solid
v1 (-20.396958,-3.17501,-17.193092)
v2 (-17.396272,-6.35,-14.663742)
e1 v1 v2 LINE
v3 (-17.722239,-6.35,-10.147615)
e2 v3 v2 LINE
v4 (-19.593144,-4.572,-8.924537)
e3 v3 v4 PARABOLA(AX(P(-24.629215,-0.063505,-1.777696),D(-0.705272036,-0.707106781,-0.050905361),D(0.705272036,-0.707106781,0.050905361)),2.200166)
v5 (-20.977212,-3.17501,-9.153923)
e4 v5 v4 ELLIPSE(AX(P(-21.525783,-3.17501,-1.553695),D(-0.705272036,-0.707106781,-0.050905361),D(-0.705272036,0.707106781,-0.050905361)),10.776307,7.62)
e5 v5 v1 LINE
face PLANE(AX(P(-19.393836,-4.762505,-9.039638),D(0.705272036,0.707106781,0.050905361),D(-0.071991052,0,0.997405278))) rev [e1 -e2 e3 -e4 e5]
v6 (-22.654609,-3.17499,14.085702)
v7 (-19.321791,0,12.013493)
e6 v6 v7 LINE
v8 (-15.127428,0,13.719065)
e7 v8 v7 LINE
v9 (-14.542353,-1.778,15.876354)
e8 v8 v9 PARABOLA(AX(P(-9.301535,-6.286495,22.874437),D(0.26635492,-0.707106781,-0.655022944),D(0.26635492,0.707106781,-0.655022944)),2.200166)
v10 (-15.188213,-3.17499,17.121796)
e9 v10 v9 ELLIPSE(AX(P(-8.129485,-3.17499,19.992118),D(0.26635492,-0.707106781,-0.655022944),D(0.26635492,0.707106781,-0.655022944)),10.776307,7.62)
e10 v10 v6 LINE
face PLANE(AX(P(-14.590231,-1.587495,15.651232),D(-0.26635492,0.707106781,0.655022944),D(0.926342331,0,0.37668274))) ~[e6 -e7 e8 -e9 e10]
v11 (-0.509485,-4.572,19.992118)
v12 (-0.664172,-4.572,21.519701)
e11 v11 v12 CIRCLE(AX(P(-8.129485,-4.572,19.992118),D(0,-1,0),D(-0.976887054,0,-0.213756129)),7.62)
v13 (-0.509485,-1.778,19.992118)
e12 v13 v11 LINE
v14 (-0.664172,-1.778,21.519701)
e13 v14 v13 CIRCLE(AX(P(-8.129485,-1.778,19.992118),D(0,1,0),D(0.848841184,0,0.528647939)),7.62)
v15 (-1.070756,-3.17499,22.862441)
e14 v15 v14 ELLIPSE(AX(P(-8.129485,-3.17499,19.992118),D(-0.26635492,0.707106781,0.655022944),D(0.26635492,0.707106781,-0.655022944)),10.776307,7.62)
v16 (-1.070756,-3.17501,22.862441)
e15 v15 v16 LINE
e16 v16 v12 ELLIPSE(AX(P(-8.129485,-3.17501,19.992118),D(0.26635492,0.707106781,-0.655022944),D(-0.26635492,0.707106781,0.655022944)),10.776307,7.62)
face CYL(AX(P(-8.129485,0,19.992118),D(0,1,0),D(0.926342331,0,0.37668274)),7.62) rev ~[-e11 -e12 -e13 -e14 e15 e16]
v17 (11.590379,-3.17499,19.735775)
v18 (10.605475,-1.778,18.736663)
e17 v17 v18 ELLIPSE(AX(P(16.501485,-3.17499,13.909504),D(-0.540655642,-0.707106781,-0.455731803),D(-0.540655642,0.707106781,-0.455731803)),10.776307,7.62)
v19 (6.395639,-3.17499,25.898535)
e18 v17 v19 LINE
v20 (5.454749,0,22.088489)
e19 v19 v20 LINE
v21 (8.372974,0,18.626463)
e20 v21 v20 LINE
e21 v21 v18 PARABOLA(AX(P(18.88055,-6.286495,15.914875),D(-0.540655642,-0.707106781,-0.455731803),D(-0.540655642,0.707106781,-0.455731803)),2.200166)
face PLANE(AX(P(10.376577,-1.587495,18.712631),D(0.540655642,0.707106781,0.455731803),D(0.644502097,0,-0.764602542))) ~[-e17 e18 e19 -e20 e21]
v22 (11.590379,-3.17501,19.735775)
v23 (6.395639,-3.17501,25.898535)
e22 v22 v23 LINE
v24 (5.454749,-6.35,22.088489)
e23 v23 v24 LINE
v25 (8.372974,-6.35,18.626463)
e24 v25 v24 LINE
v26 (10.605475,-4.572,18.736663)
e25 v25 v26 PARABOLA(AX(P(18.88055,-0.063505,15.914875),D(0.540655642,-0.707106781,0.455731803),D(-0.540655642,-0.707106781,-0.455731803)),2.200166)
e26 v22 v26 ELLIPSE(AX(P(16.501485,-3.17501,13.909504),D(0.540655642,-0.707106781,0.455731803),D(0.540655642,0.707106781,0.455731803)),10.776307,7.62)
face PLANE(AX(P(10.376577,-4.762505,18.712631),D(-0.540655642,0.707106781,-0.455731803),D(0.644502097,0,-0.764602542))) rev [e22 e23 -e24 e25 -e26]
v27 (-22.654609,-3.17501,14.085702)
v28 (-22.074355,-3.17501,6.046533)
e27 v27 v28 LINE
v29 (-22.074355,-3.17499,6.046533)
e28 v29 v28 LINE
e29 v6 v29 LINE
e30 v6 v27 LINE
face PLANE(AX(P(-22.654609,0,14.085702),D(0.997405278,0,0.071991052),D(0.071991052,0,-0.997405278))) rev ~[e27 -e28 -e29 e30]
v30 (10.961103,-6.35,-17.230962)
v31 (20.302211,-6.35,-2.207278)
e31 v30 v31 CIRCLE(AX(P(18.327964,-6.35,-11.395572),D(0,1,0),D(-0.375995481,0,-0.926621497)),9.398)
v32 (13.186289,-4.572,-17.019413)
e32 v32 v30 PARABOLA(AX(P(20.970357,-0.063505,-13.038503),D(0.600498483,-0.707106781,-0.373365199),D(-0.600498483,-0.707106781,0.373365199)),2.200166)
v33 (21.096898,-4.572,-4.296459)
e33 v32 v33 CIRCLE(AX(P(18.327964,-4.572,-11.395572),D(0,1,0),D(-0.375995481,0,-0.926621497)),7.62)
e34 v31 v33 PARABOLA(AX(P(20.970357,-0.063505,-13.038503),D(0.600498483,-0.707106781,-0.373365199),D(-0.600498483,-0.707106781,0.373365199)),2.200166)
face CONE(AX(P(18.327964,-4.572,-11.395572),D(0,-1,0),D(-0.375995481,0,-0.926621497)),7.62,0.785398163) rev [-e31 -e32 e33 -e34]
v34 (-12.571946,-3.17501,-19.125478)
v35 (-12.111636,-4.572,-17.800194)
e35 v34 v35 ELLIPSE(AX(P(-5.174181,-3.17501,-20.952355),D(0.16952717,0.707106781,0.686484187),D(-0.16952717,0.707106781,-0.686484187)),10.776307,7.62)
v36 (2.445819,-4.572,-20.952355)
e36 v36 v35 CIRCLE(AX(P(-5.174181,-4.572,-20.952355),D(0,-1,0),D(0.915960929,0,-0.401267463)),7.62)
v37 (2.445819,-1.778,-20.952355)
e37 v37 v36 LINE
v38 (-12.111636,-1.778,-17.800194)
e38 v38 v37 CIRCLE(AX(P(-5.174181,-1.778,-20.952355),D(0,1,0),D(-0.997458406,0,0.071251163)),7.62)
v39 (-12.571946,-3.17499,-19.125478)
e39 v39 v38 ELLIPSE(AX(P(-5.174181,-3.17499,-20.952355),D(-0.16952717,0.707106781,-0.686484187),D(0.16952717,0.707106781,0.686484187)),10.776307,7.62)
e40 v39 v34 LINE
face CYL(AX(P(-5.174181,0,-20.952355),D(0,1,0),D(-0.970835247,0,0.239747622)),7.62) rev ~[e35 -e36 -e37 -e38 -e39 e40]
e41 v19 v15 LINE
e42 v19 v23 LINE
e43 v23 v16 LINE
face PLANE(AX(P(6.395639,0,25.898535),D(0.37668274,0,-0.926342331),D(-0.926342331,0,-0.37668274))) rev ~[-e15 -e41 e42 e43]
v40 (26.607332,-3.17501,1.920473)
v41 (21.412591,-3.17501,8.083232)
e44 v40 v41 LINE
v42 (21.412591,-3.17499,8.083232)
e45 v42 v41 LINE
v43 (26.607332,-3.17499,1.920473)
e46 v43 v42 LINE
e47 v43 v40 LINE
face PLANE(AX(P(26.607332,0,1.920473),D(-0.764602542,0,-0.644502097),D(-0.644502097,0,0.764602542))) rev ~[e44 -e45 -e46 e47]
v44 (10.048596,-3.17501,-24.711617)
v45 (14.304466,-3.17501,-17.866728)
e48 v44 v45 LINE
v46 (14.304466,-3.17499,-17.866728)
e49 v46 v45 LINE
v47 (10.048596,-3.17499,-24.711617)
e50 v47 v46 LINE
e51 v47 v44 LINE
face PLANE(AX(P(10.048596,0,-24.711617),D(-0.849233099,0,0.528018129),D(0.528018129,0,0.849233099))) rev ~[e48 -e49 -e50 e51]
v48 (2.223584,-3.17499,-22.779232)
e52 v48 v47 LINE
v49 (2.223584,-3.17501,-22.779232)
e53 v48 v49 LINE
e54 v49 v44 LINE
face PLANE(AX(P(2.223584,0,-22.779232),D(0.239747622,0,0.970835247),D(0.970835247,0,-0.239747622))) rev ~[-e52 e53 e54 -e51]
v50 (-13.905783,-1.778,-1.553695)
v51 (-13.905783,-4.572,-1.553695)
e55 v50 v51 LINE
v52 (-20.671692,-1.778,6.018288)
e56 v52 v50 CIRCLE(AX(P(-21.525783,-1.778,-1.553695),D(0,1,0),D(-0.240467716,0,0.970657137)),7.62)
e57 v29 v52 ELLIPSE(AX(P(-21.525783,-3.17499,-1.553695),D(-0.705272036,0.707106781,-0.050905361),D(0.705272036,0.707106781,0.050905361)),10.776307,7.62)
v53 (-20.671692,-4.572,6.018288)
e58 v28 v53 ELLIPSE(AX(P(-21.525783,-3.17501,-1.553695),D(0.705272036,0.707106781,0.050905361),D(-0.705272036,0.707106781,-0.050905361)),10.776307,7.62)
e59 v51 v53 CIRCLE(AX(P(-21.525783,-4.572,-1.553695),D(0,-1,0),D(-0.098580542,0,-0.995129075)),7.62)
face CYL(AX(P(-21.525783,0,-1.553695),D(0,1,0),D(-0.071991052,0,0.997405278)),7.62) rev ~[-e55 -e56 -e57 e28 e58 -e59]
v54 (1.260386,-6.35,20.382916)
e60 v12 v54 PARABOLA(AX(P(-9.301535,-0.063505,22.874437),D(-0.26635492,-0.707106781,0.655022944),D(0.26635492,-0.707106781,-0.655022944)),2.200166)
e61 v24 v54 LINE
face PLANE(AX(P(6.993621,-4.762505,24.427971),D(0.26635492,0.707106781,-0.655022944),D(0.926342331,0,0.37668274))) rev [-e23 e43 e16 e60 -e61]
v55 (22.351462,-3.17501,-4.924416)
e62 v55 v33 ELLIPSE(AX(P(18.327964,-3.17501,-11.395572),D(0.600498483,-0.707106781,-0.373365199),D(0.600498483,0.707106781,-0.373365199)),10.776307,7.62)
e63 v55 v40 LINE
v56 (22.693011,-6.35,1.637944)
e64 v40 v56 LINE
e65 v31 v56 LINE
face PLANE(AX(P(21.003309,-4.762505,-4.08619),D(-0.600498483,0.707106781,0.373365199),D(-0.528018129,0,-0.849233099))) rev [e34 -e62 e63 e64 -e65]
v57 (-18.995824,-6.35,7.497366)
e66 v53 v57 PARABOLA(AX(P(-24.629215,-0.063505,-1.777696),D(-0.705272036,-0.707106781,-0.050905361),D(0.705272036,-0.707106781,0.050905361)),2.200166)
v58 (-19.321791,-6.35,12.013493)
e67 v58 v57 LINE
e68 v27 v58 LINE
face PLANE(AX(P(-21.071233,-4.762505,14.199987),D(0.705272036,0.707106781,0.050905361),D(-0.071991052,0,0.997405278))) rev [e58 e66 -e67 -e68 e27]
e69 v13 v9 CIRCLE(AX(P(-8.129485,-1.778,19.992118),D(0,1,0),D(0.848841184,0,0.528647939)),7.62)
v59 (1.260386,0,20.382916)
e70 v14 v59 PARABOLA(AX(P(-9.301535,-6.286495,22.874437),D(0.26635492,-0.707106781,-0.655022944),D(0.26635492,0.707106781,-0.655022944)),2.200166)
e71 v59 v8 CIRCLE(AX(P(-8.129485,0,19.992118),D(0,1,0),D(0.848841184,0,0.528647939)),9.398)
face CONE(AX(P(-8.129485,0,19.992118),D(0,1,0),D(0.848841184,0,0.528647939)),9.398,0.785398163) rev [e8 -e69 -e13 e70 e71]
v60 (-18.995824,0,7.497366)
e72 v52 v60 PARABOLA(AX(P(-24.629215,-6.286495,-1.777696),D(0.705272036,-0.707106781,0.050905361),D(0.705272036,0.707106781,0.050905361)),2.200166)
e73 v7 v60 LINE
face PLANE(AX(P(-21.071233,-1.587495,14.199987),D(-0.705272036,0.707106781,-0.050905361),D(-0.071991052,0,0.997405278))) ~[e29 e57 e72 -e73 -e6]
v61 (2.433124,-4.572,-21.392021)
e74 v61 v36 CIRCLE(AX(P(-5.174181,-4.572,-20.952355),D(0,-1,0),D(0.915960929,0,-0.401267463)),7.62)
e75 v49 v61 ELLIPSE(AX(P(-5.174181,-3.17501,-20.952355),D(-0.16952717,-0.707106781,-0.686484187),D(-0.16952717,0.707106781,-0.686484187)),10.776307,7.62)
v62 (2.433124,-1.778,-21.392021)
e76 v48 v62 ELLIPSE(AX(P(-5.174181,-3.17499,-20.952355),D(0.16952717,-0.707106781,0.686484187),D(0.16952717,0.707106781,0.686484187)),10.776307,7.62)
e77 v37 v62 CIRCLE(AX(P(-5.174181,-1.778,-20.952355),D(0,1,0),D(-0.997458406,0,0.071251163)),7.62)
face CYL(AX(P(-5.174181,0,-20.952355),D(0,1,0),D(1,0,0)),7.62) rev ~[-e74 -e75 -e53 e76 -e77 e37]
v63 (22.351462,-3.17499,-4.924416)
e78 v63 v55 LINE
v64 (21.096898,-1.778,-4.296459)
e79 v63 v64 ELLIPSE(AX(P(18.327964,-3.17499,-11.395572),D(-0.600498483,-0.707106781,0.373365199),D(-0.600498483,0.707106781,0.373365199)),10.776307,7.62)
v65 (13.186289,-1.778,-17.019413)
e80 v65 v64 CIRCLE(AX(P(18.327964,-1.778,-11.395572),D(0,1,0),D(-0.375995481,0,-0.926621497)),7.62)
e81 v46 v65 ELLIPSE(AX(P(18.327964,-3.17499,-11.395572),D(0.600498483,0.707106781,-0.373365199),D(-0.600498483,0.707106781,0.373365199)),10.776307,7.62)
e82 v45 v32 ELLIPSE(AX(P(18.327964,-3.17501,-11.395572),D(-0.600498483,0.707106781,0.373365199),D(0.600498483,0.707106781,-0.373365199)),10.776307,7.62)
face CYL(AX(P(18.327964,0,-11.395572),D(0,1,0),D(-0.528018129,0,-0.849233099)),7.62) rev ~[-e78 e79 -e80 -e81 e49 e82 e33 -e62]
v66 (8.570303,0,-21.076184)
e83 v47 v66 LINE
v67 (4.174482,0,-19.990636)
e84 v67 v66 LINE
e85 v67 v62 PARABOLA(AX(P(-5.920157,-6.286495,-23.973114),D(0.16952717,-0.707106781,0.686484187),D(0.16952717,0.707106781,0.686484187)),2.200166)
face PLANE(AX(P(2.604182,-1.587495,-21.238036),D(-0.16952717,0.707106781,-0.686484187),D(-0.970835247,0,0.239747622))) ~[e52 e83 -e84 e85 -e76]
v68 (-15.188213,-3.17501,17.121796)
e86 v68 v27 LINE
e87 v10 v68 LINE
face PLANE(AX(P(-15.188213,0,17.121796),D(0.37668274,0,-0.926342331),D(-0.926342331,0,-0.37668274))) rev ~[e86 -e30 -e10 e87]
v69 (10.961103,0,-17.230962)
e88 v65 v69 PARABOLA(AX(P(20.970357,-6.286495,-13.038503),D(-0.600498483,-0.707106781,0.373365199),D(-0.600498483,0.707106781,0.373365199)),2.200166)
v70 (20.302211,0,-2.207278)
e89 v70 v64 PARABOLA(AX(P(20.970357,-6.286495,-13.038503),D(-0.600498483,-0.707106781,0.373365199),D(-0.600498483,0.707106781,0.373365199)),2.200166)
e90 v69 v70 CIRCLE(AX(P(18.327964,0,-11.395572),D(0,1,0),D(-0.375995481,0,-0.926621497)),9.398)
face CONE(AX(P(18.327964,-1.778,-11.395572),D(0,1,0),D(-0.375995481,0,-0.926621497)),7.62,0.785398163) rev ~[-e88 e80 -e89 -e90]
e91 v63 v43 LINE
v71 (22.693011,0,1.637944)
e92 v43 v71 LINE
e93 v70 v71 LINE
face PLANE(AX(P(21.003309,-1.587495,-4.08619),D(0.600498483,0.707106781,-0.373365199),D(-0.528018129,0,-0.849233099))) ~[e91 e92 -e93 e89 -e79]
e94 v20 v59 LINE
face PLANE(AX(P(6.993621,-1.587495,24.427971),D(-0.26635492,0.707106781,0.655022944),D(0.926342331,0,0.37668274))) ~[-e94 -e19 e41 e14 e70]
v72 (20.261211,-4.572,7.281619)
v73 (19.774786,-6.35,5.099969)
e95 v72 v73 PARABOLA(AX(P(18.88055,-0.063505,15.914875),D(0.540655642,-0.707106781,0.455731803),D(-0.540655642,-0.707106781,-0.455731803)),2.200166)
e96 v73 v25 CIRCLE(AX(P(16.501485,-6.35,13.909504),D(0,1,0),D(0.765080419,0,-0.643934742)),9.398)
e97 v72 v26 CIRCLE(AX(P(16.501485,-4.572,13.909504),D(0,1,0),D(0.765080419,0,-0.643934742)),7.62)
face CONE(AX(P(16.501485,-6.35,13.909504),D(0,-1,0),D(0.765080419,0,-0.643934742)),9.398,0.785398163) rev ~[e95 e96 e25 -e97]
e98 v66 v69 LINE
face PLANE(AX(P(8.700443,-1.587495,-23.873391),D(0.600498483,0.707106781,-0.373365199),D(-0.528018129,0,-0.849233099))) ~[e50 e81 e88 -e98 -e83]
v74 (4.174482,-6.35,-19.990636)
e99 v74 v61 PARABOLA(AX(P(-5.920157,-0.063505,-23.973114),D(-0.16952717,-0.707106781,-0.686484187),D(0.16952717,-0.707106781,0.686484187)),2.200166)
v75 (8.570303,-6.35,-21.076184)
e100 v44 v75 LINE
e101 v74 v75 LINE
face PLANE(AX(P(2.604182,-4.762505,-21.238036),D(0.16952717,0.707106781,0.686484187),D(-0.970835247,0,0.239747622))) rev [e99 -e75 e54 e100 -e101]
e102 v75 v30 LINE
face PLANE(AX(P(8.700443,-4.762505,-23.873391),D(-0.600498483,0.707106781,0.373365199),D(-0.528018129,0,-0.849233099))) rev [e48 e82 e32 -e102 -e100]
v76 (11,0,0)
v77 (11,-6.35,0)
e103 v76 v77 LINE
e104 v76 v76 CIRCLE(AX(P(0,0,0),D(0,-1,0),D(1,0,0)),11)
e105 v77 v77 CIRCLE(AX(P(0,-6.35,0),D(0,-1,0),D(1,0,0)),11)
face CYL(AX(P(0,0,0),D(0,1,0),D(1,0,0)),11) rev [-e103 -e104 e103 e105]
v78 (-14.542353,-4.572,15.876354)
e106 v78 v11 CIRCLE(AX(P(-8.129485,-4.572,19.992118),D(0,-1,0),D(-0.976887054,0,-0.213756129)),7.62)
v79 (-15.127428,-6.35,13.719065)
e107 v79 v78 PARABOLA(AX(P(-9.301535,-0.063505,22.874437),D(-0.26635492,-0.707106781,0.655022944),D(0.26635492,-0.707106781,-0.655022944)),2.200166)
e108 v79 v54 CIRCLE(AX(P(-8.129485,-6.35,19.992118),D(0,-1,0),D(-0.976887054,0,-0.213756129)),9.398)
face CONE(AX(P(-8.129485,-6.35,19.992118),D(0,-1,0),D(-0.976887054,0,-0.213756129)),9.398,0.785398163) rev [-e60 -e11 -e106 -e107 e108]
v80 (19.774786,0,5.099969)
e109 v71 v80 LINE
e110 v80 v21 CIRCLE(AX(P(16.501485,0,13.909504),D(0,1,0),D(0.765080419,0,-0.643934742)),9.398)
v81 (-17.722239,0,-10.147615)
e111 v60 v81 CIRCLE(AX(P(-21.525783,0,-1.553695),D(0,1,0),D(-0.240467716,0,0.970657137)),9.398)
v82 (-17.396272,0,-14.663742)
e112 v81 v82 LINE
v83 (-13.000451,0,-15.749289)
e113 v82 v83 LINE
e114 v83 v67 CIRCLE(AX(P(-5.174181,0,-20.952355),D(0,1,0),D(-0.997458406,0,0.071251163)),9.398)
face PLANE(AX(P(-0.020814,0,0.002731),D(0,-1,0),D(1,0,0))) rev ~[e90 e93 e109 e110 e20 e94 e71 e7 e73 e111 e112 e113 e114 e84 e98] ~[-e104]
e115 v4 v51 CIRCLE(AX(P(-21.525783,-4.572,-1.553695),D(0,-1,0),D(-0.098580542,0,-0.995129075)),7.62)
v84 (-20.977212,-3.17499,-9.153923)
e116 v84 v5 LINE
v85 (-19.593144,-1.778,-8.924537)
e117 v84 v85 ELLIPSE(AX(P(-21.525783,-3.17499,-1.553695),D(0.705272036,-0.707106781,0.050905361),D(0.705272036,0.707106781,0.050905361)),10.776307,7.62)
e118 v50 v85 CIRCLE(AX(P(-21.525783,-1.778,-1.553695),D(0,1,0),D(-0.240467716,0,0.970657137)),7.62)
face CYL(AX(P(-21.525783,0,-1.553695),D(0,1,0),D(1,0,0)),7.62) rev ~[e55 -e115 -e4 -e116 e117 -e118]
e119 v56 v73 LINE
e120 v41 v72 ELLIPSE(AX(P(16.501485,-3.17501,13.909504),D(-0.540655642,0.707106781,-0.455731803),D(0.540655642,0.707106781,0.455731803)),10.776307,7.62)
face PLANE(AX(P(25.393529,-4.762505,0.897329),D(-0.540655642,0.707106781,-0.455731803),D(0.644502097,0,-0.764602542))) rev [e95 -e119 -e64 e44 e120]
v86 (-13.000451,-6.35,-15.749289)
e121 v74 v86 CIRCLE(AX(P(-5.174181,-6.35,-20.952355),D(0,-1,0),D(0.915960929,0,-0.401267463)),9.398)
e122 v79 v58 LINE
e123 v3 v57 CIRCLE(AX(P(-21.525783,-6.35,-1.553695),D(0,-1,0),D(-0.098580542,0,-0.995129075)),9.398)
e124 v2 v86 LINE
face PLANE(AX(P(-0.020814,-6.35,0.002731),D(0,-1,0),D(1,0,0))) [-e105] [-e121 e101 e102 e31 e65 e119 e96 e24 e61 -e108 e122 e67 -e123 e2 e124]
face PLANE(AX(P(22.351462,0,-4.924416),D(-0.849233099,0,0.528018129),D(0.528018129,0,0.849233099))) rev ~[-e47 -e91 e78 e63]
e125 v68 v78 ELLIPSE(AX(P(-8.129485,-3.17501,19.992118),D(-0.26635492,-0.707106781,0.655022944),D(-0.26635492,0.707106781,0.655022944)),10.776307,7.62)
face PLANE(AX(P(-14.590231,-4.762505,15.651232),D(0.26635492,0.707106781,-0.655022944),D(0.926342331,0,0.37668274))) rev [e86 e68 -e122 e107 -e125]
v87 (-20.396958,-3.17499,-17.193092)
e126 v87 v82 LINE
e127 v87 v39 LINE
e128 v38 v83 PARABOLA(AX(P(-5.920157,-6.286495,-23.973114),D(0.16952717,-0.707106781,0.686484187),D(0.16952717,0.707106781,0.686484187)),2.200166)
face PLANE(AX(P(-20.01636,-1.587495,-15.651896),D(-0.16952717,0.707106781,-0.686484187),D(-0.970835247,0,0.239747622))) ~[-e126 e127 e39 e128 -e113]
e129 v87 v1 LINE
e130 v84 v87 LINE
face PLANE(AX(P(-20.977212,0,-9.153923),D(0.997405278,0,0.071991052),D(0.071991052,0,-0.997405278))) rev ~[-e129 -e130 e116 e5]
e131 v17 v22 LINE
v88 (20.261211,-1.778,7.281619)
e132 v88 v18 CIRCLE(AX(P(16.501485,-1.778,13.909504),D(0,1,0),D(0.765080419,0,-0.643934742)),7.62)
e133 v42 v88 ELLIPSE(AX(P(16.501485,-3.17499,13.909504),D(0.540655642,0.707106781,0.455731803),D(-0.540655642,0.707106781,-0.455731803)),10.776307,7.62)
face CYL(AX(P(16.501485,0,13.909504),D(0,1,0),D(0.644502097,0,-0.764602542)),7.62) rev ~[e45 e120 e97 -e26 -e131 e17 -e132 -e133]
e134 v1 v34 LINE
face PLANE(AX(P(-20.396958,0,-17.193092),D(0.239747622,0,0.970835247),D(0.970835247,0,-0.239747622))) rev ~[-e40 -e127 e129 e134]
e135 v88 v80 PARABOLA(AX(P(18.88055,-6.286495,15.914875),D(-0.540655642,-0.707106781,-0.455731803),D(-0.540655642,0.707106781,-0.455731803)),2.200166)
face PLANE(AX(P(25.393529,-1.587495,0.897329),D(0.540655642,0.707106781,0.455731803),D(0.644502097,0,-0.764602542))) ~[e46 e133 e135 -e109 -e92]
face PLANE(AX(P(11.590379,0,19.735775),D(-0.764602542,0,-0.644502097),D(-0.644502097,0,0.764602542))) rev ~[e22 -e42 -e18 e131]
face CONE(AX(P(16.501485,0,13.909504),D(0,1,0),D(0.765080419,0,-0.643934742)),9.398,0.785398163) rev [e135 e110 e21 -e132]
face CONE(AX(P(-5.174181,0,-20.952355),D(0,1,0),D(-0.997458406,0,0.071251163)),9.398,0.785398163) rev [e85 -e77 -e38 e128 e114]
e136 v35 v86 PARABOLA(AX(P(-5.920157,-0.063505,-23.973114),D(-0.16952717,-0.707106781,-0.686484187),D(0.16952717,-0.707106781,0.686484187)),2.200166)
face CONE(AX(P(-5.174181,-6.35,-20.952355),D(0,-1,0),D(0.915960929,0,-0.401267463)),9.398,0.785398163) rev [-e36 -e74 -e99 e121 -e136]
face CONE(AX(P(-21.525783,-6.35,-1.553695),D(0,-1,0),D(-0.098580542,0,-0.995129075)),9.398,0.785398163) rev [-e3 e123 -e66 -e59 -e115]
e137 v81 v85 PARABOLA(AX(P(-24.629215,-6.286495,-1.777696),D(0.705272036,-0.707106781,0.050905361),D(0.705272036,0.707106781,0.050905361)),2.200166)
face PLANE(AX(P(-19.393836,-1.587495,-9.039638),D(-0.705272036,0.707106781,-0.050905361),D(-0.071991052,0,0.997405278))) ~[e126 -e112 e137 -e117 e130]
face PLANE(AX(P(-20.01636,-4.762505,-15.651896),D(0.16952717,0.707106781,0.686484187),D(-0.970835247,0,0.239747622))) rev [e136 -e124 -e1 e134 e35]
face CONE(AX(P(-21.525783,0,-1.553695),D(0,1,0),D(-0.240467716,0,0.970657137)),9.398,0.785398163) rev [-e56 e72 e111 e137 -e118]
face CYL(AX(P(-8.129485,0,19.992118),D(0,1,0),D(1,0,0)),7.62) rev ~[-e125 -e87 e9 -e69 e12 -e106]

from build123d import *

# Parameters (mm, degrees)
F0_R         = 11
F1_DEPTH     = 6.35
F2_SIZE      = 3.17499
F3_T2_ANGLE  = 199.5715846066
F3_T4_ANGLE  = 199.5715846066
F3_T6_ANGLE  = 199.5715846066
F3_T8_ANGLE  = 199.5715846066
F3_T10_ANGLE = 199.5715846066
F3_T12_ANGLE = 199.5715846066
F3_T14_ANGLE = 199.5715846066
F3_T16_ANGLE = 199.5715846066
F3_T18_ANGLE = 199.5715846066
F3_T20_ANGLE = 199.5715846066


# Not quite as in the source:
# - a fillet or chamfer that OpenCascade refuses, or shapes differently, is made with other operations: its cross-section is extruded or revolved along the edge and cut away or added
# - a fillet or chamfer is up to 0.001 mm smaller than in the source, because OpenCascade refuses the exact size


with BuildPart() as f1:
    # F0 (on Front) → F1 (new body)
    with BuildSketch(Plane.XZ):
        with BuildLine():
            Line((11.5903794876, 19.7357752055), (6.395639386, 25.8985348046))
            Line((6.395639386, 25.8985348046), (-1.0707562618, 22.8624408289))
            ThreePointArc((-1.0707562618, 22.8624408289), (-0.6511189694, 21.4544603732), (-0.5094848211, 19.9921183513))
            ThreePointArc((-0.5094848211, 19.9921183513), (-6.6671427992, 12.5137524996), (-15.1882133804, 17.1217958736))
            Line((-15.1882133804, 17.1217958736), (-22.6546090282, 14.085701898))
            Line((-22.6546090282, 14.085701898), (-22.0743552105, 6.0465330289))
            ThreePointArc((-22.0743552105, 6.0465330289), (-16.3352014079, 4.025037517), (-13.9057833978, -1.5536951891))
            ThreePointArc((-13.9057833978, -1.5536951891), (-15.9470506916, -6.744277179), (-20.977211585, -9.1539234072))
            Line((-20.977211585, -9.1539234072), (-20.3969577673, -17.1930922762))
            Line((-20.3969577673, -17.1930922762), (-12.5719455381, -19.125477903))
            ThreePointArc((-12.5719455381, -19.125477903), (-4.2540087238, -13.3881176755), (2.4458190468, -20.9523547863))
            ThreePointArc((2.4458190468, -20.9523547863), (2.3900561576, -21.8725270157), (2.2235836317, -22.7792316697))
            Line((2.2235836317, -22.7792316697), (10.0485958609, -24.7116172964))
            Line((10.0485958609, -24.7116172964), (14.3044655632, -17.866728424))
            ThreePointArc((14.3044655632, -17.866728424), (11.8568074939, -7.3720740717), (22.3514618462, -4.9244160023))
            Line((22.3514618462, -4.9244160023), (26.6073315486, 1.9204728701))
            Line((26.6073315486, 1.9204728701), (21.412591447, 8.0832324691))
            ThreePointArc((21.412591447, 8.0832324691), (10.6752140991, 8.9983978576), (11.5903794876, 19.7357752055))
        make_face()
        Circle(F0_R, mode=Mode.SUBTRACT)
    extrude(amount=F1_DEPTH)

    # F2 (size 3.175 in the source; OpenCascade refuses exactly that, so slightly less here)
    f2_edges = [f1.edges().sort_by_distance(p)[0] for p in [
        (24.479397, -6.35, -1.501972),
        (24.009961, -6.35, 5.001853),
        (8.993009, -6.35, 22.817155),
        (2.662442, -6.35, 24.380488),
        (-18.921411, -6.35, 15.603749),
        (-22.364482, -6.35, 10.066117),
        (-20.687085, -6.35, -13.173508),
        (-16.484452, -6.35, -18.159285),
        (24.009961, 0, 5.001853),
        (24.479397, 0, -1.501972),
        (8.993009, 0, 22.817155),
        (2.662442, 0, 24.380488),
        (-18.921411, 0, 15.603749),
        (-22.364482, 0, 10.066117),
        (-20.687085, 0, -13.173508),
        (-16.484452, 0, -18.159285),
        (6.13609, 0, -23.745424),
        (12.176531, 0, -21.289173),
        (12.176531, -6.35, -21.289173),
        (6.13609, -6.35, -23.745424),
    ]]
    chamfer(f2_edges, length=F2_SIZE)

    # F3: chamfer of 1.778 on 10 edges, made by hand

    # F3_s1 → F3_t2 (revolve, cut)
    with BuildSketch(Plane(origin=(19.7071717725, 0, -7.9965849701), x_dir=(0, 1, 0), z_dir=(0.9266214967, 0, -0.3759954812))):
        Polygon((-1.778, -11.2881506475), (0, -13.0661506475), (0, -11.2881506475), align=None)
    revolve(axis=Axis((18.3279637047, 0, -11.3955722132), (0, 1, 0)), revolution_arc=F3_T2_ANGLE, mode=Mode.SUBTRACT)

    # F3_s3 → F3_t4 (revolve, cut)
    with BuildSketch(Plane(origin=(19.7071717725, 0, -7.9965849701), x_dir=(0, 1, 0), z_dir=(0.9266214967, 0, -0.3759954812))):
        Polygon((-4.572, -11.2881506475), (-6.35, -13.0661506475), (-6.35, -11.2881506475), align=None)
    revolve(axis=Axis((18.3279637047, -6.35, -11.3955722132), (0, 1, 0)), revolution_arc=F3_T4_ANGLE, mode=Mode.SUBTRACT)

    # F3_s5 → F3_t6 (revolve, cut)
    with BuildSketch(Plane(origin=(-8.534063628, 0, -19.4804452837), x_dir=(0, 1, 0), z_dir=(-0.4012674626, 0, -0.915960929))):
        Polygon((-6.35, 13.0661506475), (-4.572, 11.2881506475), (-6.35, 11.2881506475), align=None)
    revolve(axis=Axis((-5.1741809532, -6.35, -20.9523547863), (0, -1, 0)), revolution_arc=F3_T6_ANGLE, mode=Mode.SUBTRACT)

    # F3_s7 → F3_t8 (revolve, cut)
    with BuildSketch(Plane(origin=(-1.5153532552, 0, -21.2137147847), x_dir=(0, 1, 0), z_dir=(-0.0712511627, 0, -0.9974584061))):
        Polygon((0, -13.0661506475), (-1.778, -11.2881506475), (0, -11.2881506475), align=None)
    revolve(axis=Axis((-5.1741809532, 0, -20.9523547863), (0, 1, 0)), revolution_arc=F3_T8_ANGLE, mode=Mode.SUBTRACT)

    # F3_s9 → F3_t10 (revolve, cut)
    with BuildSketch(Plane(origin=(-21.1641751195, 0, 2.0965881732), x_dir=(0, 1, 0), z_dir=(-0.9951290754, 0, 0.0985805418))):
        Polygon((-6.35, 13.0661506475), (-4.572, 11.2881506475), (-6.35, 11.2881506475), align=None)
    revolve(axis=Axis((-21.5257833978, -6.35, -1.5536951891), (0, -1, 0)), revolution_arc=F3_T10_ANGLE, mode=Mode.SUBTRACT)

    # F3_s11 → F3_t12 (revolve, cut)
    with BuildSketch(Plane(origin=(-20.6437115892, 0, -5.1142117945), x_dir=(0, 1, 0), z_dir=(-0.9706571369, 0, -0.2404677161))):
        Polygon((0, -13.0661506475), (-1.778, -11.2881506475), (0, -11.2881506475), align=None)
    revolve(axis=Axis((-21.5257833978, 0, -1.5536951891), (0, 1, 0)), revolution_arc=F3_T12_ANGLE, mode=Mode.SUBTRACT)

    # F3_s13 → F3_t14 (revolve, cut)
    with BuildSketch(Plane(origin=(-4.5461159397, 0, 20.7762080351), x_dir=(0, 1, 0), z_dir=(-0.2137561292, 0, 0.9768870545))):
        Polygon((-6.35, 13.0661506475), (-4.572, 11.2881506475), (-6.35, 11.2881506475), align=None)
    revolve(axis=Axis((-8.1294848211, -6.35, 19.9921183513), (0, -1, 0)), revolution_arc=F3_T14_ANGLE, mode=Mode.SUBTRACT)

    # F3_s15 → F3_t16 (revolve, cut)
    with BuildSketch(Plane(origin=(-11.2431621609, 0, 18.0529580701), x_dir=(0, 1, 0), z_dir=(-0.5286479394, 0, 0.8488411843))):
        Polygon((0, -13.0661506475), (-1.778, -11.2881506475), (0, -11.2881506475), align=None)
    revolve(axis=Axis((-8.1294848211, 0, 19.9921183513), (0, 1, 0)), revolution_arc=F3_T16_ANGLE, mode=Mode.SUBTRACT)

    # F3_s17 → F3_t18 (revolve, cut)
    with BuildSketch(Plane(origin=(13.6950552327, 0, 16.2715534792), x_dir=(0, 1, 0), z_dir=(0.6439347423, 0, 0.7650804191))):
        Polygon((-6.35, -13.0661506475), (-4.572, -11.2881506475), (-6.35, -11.2881506475), align=None)
    revolve(axis=Axis((16.5014854673, -6.35, 13.9095038373), (0, 1, 0)), revolution_arc=F3_T18_ANGLE, mode=Mode.SUBTRACT)

    # F3_s19 → F3_t20 (revolve, cut)
    with BuildSketch(Plane(origin=(13.6950552327, 0, 16.2715534792), x_dir=(0, 1, 0), z_dir=(0.6439347423, 0, 0.7650804191))):
        Polygon((0, -13.0661506475), (-1.778, -11.2881506475), (0, -11.2881506475), align=None)
    revolve(axis=Axis((16.5014854673, 0, 13.9095038373), (0, 1, 0)), revolution_arc=F3_T20_ANGLE, mode=Mode.SUBTRACT)


solid = f1.part
